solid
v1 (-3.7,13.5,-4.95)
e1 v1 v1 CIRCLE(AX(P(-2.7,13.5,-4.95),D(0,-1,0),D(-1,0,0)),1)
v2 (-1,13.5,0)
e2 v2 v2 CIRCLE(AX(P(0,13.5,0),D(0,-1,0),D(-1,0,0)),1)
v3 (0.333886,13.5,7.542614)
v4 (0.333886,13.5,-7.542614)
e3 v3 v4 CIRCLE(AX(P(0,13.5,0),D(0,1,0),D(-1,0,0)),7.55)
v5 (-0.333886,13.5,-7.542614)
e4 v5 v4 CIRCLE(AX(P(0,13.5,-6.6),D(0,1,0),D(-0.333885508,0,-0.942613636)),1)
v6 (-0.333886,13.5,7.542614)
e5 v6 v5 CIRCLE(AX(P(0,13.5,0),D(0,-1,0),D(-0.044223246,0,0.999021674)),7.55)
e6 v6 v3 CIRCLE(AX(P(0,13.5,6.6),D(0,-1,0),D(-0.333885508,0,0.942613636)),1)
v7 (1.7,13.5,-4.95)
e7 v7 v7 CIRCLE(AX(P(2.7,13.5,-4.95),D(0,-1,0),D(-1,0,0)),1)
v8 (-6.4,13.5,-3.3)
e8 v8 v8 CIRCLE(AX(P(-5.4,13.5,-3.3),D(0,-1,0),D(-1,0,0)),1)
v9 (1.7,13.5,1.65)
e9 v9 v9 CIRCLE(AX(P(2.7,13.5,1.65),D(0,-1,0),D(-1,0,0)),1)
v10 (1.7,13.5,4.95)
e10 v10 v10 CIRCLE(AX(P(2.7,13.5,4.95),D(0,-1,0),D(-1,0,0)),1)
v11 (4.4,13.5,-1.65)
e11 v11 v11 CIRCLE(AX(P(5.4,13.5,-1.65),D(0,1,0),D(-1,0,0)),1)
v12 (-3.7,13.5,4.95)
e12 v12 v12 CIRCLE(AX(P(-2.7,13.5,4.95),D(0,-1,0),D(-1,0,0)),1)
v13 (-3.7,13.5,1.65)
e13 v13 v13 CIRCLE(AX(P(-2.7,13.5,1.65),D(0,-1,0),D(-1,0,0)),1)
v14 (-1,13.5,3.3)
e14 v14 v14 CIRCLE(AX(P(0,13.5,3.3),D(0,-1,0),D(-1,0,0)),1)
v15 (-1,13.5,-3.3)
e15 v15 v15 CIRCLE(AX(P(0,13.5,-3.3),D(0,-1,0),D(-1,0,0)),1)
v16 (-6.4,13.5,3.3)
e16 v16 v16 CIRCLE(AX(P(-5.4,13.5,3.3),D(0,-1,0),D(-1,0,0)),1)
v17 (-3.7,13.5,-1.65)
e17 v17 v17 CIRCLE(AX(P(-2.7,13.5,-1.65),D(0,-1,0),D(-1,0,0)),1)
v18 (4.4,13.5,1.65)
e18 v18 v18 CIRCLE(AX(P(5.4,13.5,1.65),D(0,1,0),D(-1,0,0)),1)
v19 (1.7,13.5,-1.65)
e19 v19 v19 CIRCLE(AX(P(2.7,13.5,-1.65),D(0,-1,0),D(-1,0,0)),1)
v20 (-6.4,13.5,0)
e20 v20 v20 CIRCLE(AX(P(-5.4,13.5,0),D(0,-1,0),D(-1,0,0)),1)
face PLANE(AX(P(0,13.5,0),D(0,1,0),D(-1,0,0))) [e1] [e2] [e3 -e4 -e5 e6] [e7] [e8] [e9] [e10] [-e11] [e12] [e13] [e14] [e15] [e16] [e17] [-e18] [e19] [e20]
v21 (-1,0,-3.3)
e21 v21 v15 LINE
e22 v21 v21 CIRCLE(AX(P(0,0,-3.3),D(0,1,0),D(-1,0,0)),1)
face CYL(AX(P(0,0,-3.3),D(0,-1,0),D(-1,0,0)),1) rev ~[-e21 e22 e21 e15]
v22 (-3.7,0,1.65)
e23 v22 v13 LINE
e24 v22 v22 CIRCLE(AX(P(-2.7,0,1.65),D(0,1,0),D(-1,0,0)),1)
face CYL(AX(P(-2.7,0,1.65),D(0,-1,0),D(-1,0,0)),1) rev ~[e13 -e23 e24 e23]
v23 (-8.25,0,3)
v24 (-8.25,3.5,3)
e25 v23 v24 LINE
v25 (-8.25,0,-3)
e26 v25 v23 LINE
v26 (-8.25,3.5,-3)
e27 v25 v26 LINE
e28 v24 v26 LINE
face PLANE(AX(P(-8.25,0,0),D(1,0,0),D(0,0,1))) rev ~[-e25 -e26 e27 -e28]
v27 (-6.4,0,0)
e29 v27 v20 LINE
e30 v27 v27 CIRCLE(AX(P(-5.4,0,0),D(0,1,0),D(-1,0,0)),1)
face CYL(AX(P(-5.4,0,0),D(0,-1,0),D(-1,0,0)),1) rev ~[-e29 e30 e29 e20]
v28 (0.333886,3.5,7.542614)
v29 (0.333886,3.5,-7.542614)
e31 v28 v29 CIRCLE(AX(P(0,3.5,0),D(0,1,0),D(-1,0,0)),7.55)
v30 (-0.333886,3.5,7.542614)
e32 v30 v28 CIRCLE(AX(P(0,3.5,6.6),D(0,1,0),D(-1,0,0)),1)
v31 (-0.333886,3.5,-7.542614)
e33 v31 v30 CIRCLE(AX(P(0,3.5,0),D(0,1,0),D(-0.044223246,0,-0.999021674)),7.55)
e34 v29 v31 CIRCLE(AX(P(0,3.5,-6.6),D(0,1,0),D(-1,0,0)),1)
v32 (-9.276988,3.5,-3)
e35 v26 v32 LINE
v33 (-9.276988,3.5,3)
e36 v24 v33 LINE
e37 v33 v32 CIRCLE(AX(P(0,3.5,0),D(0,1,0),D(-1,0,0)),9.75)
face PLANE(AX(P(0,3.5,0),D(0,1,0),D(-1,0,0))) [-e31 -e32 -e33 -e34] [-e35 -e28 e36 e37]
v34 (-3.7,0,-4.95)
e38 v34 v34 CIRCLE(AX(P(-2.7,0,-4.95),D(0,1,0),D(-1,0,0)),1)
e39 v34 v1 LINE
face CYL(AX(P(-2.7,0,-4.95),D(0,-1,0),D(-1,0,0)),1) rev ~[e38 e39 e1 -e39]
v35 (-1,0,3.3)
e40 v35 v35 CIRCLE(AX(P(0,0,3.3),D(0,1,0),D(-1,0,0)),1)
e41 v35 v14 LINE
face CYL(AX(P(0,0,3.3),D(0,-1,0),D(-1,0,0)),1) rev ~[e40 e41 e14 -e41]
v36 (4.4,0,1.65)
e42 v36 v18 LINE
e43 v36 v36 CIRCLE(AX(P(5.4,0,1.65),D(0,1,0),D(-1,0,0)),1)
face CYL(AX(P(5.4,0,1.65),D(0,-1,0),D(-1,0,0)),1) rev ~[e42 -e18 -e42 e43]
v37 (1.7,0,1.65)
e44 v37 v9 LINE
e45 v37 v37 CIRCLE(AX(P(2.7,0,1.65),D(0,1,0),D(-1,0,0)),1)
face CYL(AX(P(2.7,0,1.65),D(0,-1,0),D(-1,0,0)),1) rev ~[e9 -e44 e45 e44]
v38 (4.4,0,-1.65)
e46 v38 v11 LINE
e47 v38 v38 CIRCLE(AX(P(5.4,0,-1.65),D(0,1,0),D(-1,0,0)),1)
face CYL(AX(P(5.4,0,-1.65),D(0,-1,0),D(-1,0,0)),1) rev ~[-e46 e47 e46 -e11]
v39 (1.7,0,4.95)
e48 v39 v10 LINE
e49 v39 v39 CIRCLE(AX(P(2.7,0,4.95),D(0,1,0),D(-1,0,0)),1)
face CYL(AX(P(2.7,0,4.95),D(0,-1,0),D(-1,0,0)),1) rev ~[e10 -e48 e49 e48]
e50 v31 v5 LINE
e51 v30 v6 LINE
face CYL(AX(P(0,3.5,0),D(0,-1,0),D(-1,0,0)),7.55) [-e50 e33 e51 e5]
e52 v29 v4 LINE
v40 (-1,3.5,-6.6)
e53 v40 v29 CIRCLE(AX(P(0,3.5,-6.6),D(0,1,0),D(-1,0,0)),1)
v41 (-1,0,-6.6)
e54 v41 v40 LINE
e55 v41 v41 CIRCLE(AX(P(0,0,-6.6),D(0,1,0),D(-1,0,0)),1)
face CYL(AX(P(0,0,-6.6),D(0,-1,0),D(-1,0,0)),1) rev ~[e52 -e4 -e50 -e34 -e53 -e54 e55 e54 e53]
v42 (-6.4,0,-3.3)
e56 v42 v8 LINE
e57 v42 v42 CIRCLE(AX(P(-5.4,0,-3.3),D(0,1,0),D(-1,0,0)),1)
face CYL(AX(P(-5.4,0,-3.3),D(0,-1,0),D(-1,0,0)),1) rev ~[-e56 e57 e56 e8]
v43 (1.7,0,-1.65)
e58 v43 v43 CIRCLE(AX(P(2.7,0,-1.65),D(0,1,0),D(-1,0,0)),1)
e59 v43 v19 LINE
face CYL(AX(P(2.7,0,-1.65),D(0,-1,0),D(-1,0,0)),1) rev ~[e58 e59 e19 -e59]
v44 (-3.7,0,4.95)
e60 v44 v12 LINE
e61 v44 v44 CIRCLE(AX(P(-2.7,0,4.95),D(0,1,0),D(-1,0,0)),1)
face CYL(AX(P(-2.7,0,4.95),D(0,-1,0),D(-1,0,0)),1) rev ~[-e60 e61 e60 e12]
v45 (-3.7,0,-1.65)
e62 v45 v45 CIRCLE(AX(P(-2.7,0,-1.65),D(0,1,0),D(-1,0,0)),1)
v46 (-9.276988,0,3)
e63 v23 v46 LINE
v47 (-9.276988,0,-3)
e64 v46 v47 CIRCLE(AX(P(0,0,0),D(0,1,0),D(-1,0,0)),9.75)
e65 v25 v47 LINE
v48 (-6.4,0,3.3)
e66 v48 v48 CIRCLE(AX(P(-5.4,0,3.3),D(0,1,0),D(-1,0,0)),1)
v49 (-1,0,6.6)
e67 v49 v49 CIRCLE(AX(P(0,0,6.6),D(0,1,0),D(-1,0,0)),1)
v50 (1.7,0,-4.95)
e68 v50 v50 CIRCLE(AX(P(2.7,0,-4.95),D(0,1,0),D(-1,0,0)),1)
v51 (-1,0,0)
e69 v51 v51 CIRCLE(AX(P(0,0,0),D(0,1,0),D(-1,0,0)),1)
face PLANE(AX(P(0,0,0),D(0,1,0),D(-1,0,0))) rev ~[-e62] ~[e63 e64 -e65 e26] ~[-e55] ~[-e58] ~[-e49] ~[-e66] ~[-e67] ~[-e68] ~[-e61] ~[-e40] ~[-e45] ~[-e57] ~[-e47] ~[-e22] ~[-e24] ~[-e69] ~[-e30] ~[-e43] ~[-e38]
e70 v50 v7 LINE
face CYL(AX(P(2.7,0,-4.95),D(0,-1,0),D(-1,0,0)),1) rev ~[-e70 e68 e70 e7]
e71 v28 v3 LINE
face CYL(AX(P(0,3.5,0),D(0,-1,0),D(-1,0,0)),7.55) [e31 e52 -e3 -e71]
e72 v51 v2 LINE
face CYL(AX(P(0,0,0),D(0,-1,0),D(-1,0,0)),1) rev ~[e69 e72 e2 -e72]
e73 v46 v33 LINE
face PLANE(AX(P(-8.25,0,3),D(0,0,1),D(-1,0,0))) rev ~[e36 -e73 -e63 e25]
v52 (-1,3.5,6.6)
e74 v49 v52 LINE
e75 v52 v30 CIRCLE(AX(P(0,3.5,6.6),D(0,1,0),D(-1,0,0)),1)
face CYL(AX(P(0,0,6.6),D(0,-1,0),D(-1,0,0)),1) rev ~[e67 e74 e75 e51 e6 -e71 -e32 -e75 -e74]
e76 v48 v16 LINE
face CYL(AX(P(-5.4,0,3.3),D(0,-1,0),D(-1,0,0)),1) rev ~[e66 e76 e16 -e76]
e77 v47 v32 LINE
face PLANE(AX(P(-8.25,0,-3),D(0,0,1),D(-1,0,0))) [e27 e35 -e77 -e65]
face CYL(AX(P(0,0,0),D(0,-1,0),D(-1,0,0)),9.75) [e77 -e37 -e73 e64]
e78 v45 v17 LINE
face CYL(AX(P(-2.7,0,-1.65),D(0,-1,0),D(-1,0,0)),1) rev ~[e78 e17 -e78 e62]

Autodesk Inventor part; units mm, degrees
ref_plane "YZ Plane" through (0, 0, 0) normal (1, 0, 0) x (0, 1, 0)
ref_plane "XZ Plane" through (0, 0, 0) normal (0, 1, 0) x (-1, 0, 0)
ref_plane "XY Plane" through (0, 0, 0) normal (0, 0, 1) x (1, 0, 0)
sketch "Sketch1" plane through (0, 0, 0) normal (0, 1, 0) x (-1, 0, 0)
  point P0 (0, 0)
sketch "Sketch2" plane through (0, 0, 0) normal (0, 1, 0) x (-1, 0, 0)
  line L0 (0, -0.6) -> (0, -2.7)
  line L1 (0, -2.7) -> (0, -3.3)
  line L2 (0, -3.9) -> (0, -6)
  line L3 (0, -6) -> (0, -6.6)
  line L4 (0, 0.6) -> (0, 3.3)
  line L5 (0, 3.9) -> (0, 6.6)
  line L6 (0, -0.6) -> (0, -1.65)
  line L7 (0, -0.6) -> (0, -1.65)
  line L8 (0, -1.65) -> (2.7, -1.65)
  line L9 (2.7, -1.65) -> (2.7, -3.75)
  line L10 (2.7, -3.75) -> (2.7, -4.95)
  line L11 (2.7, -1.05) -> (2.7, 1.05)
  line L12 (2.7, 1.05) -> (2.7, 1.65)
  line L13 (2.7, 2.25) -> (2.7, 4.95)
  line L14 (2.7, 0) -> (5.4, 0)
  line L15 (5.4, 0) -> (5.4, -3.3)
  line L16 (5.4, 0) -> (5.4, 3.3)
  line L17 (0, -1.65) -> (-2.7, -1.65)
  line L18 (-2.7, -1.65) -> (-2.7, -4.35)
  line L19 (-2.7, -4.35) -> (-2.7, -4.95)
  line L20 (-2.7, -1.65) -> (-2.7, 1.65)
  line L21 (-2.7, 1.65) -> (-2.7, 4.95)
  line L22 (-2.7, -1.65) -> (-5.4, -1.65)
  line L23 (-2.7, 1.65) -> (-5.4, 1.65)
  circle A0 centre (0, -6.6) radius 1
  circle A1 centre (2.7, -4.95) radius 1
  circle A2 centre (-2.7, -4.95) radius 1
  circle A3 centre (0, -3.3) radius 1
  circle A4 centre (5.4, -3.3) radius 1
  circle A5 centre (2.7, -1.65) radius 1
  circle A6 centre (-2.7, -1.65) radius 1
  circle A7 centre (-5.4, -1.65) radius 1
  circle A8 centre (0, 0) radius 1
  circle A9 centre (5.4, 0) radius 1
  circle A10 centre (2.7, 1.65) radius 1
  circle A11 centre (5.4, 3.3) radius 1
  circle A12 centre (0, 3.3) radius 1
  circle A13 centre (-2.7, 1.65) radius 1
  circle A14 centre (-5.4, 1.65) radius 1
  circle A15 centre (-2.7, 4.95) radius 1
  circle A16 centre (2.7, 4.95) radius 1
  circle A17 centre (0, 6.6) radius 1
  circle A18 centre (0, 0) radius 9.75
  line L24 (9.75, 0) -> (8.25, 0)
  line L25 (8.25, 0) -> (8.25, 3)
  line L26 (8.25, 3) -> (10.1008, 3)
  line L27 (8.25, 0) -> (8.25, -3)
  line L28 (8.25, -3) -> (10.4334, -3)
  point P0 (-2, 10.0571)
  point P1 (2, 10.0571)
  point P2 (9.277, 3)
  point P3 (9.277, -3)
  dimension "d127" = 19.5
  dimension "d53" = 2.1
  dimension "d54" = 0.6
  dimension "d56" = 2.1
  dimension "d57" = 0.6
  dimension "d59" = 2.7
  dimension "d61" = 2.7
  dimension "d63" = 1.05
  dimension "d64" = 2.7
  dimension "d66" = 2.1
  dimension "d67" = 1.2
  dimension "d69" = 2.1
  dimension "d70" = 0.6
  dimension "d72" = 2.7
  dimension "d74" = 2.7
  dimension "d78" = 2.7
  dimension "d80" = 2.7
  dimension "d81" = 0.6
  dimension "d85" = 2.7
  dimension "d87" = 2.7
  dimension "d91" = 2
  dimension "d92" = 2
  dimension "d93" = 2
  dimension "d94" = 2
  dimension "d95" = 2
  dimension "d96" = 2
  dimension "d97" = 2
  dimension "d98" = 2
  dimension "d99" = 2
  dimension "d100" = 2
  dimension "d101" = 2
  dimension "d102" = 2
  dimension "d103" = 2
  dimension "d104" = 2
  dimension "d105" = 2
  dimension "d106" = 2
  dimension "d107" = 2
  dimension "d108" = 2
  dimension "d128" = 1.5
  dimension "d129" = 3
  dimension "d130" = 3
extrude "Extrusion1" add sketch "Sketch2" along normal blind 3.5 contours L26 L25 L27 L28 A18
sketch "Sketch3" plane through (0, 3.5, 0) normal (0, 1, 0) x (-1, 0, 0)
  circle A0 centre (0, 0) radius 7.55
  line L0 (0, -0.6) -> (0, -2.7)
  line L1 (0, -2.7) -> (0, -3.3)
  line L2 (0, -3.9) -> (0, -6)
  line L3 (0, -6) -> (0, -6.6)
  line L4 (0, 0.6) -> (0, 3.3)
  line L5 (0, 3.9) -> (0, 6.6)
  line L6 (0, -0.6) -> (0, -1.65)
  line L7 (0, -0.6) -> (0, -1.65)
  line L8 (0, -1.65) -> (2.7, -1.65)
  line L9 (2.7, -1.65) -> (2.7, -3.75)
  line L10 (2.7, -3.75) -> (2.7, -4.95)
  line L11 (2.7, -1.05) -> (2.7, 1.05)
  line L12 (2.7, 1.05) -> (2.7, 1.65)
  line L13 (2.7, 2.25) -> (2.7, 4.95)
  line L14 (2.7, 0) -> (5.4, 0)
  line L15 (5.4, 0) -> (5.4, -3.3)
  line L16 (5.4, 0) -> (5.4, 3.3)
  line L17 (0, -1.65) -> (-2.7, -1.65)
  line L18 (-2.7, -1.65) -> (-2.7, -4.35)
  line L19 (-2.7, -4.35) -> (-2.7, -4.95)
  line L20 (-2.7, -1.65) -> (-2.7, 1.65)
  line L21 (-2.7, 1.65) -> (-2.7, 4.95)
  line L22 (-2.7, -1.65) -> (-5.4, -1.65)
  line L23 (-2.7, 1.65) -> (-5.4, 1.65)
  circle A1 centre (0, -6.6) radius 1
  circle A2 centre (-2.7, -4.95) radius 1
  circle A3 centre (0, -3.3) radius 1
  circle A4 centre (2.7, -4.95) radius 1
  circle A5 centre (5.4, -3.3) radius 1
  circle A6 centre (2.7, -1.65) radius 1
  circle A7 centre (-2.7, -1.65) radius 1
  circle A8 centre (-5.4, -1.65) radius 1
  circle A9 centre (5.4, 0) radius 1
  circle A10 centre (0, 0) radius 1
  circle A11 centre (2.7, 1.65) radius 1
  circle A12 centre (-2.7, 1.65) radius 1
  circle A13 centre (-5.4, 1.65) radius 1
  circle A14 centre (0, 3.3) radius 1
  circle A15 centre (5.4, 3.3) radius 1
  circle A16 centre (2.7, 4.95) radius 1
  circle A17 centre (-2.7, 4.95) radius 1
  circle A18 centre (0, 6.6) radius 1
  point P0 (-0.3339, 7.5426)
  point P1 (-0.3339, -7.5426)
  point P2 (0.3339, -7.5426)
  point P3 (0.3339, 7.5426)
  dimension "d12" = 2.1
  dimension "d13" = 0.6
  dimension "d15" = 2.1
  dimension "d16" = 0.6
  dimension "d18" = 2.7
  dimension "d20" = 2.7
  dimension "d22" = 1.05
  dimension "d23" = 2.7
  dimension "d25" = 2.1
  dimension "d26" = 1.2
  dimension "d28" = 2.1
  dimension "d29" = 0.6
  dimension "d31" = 2.7
  dimension "d33" = 2.7
  dimension "d37" = 2.7
  dimension "d39" = 2.7
  dimension "d40" = 0.6
  dimension "d44" = 2.7
  dimension "d46" = 2.7
  dimension "d109" = 2
  dimension "d110" = 2
  dimension "d111" = 2
  dimension "d112" = 2
  dimension "d113" = 2
  dimension "d114" = 2
  dimension "d115" = 2
  dimension "d116" = 2
  dimension "d117" = 2
  dimension "d118" = 2
  dimension "d119" = 2
  dimension "d120" = 2
  dimension "d121" = 2
  dimension "d122" = 2
  dimension "d123" = 2
  dimension "d124" = 2
  dimension "d125" = 2
  dimension "d126" = 2
extrude "Extrusion2" add sketch "Sketch3" along normal blind 10 contours A0 A1 L2 A3 L0 A10 L4 A14 L5 A18 | A18 L5 A14 L4 A10 L0 A3 L2 A1 A0
properties part number "inner Part of Adaptor"
